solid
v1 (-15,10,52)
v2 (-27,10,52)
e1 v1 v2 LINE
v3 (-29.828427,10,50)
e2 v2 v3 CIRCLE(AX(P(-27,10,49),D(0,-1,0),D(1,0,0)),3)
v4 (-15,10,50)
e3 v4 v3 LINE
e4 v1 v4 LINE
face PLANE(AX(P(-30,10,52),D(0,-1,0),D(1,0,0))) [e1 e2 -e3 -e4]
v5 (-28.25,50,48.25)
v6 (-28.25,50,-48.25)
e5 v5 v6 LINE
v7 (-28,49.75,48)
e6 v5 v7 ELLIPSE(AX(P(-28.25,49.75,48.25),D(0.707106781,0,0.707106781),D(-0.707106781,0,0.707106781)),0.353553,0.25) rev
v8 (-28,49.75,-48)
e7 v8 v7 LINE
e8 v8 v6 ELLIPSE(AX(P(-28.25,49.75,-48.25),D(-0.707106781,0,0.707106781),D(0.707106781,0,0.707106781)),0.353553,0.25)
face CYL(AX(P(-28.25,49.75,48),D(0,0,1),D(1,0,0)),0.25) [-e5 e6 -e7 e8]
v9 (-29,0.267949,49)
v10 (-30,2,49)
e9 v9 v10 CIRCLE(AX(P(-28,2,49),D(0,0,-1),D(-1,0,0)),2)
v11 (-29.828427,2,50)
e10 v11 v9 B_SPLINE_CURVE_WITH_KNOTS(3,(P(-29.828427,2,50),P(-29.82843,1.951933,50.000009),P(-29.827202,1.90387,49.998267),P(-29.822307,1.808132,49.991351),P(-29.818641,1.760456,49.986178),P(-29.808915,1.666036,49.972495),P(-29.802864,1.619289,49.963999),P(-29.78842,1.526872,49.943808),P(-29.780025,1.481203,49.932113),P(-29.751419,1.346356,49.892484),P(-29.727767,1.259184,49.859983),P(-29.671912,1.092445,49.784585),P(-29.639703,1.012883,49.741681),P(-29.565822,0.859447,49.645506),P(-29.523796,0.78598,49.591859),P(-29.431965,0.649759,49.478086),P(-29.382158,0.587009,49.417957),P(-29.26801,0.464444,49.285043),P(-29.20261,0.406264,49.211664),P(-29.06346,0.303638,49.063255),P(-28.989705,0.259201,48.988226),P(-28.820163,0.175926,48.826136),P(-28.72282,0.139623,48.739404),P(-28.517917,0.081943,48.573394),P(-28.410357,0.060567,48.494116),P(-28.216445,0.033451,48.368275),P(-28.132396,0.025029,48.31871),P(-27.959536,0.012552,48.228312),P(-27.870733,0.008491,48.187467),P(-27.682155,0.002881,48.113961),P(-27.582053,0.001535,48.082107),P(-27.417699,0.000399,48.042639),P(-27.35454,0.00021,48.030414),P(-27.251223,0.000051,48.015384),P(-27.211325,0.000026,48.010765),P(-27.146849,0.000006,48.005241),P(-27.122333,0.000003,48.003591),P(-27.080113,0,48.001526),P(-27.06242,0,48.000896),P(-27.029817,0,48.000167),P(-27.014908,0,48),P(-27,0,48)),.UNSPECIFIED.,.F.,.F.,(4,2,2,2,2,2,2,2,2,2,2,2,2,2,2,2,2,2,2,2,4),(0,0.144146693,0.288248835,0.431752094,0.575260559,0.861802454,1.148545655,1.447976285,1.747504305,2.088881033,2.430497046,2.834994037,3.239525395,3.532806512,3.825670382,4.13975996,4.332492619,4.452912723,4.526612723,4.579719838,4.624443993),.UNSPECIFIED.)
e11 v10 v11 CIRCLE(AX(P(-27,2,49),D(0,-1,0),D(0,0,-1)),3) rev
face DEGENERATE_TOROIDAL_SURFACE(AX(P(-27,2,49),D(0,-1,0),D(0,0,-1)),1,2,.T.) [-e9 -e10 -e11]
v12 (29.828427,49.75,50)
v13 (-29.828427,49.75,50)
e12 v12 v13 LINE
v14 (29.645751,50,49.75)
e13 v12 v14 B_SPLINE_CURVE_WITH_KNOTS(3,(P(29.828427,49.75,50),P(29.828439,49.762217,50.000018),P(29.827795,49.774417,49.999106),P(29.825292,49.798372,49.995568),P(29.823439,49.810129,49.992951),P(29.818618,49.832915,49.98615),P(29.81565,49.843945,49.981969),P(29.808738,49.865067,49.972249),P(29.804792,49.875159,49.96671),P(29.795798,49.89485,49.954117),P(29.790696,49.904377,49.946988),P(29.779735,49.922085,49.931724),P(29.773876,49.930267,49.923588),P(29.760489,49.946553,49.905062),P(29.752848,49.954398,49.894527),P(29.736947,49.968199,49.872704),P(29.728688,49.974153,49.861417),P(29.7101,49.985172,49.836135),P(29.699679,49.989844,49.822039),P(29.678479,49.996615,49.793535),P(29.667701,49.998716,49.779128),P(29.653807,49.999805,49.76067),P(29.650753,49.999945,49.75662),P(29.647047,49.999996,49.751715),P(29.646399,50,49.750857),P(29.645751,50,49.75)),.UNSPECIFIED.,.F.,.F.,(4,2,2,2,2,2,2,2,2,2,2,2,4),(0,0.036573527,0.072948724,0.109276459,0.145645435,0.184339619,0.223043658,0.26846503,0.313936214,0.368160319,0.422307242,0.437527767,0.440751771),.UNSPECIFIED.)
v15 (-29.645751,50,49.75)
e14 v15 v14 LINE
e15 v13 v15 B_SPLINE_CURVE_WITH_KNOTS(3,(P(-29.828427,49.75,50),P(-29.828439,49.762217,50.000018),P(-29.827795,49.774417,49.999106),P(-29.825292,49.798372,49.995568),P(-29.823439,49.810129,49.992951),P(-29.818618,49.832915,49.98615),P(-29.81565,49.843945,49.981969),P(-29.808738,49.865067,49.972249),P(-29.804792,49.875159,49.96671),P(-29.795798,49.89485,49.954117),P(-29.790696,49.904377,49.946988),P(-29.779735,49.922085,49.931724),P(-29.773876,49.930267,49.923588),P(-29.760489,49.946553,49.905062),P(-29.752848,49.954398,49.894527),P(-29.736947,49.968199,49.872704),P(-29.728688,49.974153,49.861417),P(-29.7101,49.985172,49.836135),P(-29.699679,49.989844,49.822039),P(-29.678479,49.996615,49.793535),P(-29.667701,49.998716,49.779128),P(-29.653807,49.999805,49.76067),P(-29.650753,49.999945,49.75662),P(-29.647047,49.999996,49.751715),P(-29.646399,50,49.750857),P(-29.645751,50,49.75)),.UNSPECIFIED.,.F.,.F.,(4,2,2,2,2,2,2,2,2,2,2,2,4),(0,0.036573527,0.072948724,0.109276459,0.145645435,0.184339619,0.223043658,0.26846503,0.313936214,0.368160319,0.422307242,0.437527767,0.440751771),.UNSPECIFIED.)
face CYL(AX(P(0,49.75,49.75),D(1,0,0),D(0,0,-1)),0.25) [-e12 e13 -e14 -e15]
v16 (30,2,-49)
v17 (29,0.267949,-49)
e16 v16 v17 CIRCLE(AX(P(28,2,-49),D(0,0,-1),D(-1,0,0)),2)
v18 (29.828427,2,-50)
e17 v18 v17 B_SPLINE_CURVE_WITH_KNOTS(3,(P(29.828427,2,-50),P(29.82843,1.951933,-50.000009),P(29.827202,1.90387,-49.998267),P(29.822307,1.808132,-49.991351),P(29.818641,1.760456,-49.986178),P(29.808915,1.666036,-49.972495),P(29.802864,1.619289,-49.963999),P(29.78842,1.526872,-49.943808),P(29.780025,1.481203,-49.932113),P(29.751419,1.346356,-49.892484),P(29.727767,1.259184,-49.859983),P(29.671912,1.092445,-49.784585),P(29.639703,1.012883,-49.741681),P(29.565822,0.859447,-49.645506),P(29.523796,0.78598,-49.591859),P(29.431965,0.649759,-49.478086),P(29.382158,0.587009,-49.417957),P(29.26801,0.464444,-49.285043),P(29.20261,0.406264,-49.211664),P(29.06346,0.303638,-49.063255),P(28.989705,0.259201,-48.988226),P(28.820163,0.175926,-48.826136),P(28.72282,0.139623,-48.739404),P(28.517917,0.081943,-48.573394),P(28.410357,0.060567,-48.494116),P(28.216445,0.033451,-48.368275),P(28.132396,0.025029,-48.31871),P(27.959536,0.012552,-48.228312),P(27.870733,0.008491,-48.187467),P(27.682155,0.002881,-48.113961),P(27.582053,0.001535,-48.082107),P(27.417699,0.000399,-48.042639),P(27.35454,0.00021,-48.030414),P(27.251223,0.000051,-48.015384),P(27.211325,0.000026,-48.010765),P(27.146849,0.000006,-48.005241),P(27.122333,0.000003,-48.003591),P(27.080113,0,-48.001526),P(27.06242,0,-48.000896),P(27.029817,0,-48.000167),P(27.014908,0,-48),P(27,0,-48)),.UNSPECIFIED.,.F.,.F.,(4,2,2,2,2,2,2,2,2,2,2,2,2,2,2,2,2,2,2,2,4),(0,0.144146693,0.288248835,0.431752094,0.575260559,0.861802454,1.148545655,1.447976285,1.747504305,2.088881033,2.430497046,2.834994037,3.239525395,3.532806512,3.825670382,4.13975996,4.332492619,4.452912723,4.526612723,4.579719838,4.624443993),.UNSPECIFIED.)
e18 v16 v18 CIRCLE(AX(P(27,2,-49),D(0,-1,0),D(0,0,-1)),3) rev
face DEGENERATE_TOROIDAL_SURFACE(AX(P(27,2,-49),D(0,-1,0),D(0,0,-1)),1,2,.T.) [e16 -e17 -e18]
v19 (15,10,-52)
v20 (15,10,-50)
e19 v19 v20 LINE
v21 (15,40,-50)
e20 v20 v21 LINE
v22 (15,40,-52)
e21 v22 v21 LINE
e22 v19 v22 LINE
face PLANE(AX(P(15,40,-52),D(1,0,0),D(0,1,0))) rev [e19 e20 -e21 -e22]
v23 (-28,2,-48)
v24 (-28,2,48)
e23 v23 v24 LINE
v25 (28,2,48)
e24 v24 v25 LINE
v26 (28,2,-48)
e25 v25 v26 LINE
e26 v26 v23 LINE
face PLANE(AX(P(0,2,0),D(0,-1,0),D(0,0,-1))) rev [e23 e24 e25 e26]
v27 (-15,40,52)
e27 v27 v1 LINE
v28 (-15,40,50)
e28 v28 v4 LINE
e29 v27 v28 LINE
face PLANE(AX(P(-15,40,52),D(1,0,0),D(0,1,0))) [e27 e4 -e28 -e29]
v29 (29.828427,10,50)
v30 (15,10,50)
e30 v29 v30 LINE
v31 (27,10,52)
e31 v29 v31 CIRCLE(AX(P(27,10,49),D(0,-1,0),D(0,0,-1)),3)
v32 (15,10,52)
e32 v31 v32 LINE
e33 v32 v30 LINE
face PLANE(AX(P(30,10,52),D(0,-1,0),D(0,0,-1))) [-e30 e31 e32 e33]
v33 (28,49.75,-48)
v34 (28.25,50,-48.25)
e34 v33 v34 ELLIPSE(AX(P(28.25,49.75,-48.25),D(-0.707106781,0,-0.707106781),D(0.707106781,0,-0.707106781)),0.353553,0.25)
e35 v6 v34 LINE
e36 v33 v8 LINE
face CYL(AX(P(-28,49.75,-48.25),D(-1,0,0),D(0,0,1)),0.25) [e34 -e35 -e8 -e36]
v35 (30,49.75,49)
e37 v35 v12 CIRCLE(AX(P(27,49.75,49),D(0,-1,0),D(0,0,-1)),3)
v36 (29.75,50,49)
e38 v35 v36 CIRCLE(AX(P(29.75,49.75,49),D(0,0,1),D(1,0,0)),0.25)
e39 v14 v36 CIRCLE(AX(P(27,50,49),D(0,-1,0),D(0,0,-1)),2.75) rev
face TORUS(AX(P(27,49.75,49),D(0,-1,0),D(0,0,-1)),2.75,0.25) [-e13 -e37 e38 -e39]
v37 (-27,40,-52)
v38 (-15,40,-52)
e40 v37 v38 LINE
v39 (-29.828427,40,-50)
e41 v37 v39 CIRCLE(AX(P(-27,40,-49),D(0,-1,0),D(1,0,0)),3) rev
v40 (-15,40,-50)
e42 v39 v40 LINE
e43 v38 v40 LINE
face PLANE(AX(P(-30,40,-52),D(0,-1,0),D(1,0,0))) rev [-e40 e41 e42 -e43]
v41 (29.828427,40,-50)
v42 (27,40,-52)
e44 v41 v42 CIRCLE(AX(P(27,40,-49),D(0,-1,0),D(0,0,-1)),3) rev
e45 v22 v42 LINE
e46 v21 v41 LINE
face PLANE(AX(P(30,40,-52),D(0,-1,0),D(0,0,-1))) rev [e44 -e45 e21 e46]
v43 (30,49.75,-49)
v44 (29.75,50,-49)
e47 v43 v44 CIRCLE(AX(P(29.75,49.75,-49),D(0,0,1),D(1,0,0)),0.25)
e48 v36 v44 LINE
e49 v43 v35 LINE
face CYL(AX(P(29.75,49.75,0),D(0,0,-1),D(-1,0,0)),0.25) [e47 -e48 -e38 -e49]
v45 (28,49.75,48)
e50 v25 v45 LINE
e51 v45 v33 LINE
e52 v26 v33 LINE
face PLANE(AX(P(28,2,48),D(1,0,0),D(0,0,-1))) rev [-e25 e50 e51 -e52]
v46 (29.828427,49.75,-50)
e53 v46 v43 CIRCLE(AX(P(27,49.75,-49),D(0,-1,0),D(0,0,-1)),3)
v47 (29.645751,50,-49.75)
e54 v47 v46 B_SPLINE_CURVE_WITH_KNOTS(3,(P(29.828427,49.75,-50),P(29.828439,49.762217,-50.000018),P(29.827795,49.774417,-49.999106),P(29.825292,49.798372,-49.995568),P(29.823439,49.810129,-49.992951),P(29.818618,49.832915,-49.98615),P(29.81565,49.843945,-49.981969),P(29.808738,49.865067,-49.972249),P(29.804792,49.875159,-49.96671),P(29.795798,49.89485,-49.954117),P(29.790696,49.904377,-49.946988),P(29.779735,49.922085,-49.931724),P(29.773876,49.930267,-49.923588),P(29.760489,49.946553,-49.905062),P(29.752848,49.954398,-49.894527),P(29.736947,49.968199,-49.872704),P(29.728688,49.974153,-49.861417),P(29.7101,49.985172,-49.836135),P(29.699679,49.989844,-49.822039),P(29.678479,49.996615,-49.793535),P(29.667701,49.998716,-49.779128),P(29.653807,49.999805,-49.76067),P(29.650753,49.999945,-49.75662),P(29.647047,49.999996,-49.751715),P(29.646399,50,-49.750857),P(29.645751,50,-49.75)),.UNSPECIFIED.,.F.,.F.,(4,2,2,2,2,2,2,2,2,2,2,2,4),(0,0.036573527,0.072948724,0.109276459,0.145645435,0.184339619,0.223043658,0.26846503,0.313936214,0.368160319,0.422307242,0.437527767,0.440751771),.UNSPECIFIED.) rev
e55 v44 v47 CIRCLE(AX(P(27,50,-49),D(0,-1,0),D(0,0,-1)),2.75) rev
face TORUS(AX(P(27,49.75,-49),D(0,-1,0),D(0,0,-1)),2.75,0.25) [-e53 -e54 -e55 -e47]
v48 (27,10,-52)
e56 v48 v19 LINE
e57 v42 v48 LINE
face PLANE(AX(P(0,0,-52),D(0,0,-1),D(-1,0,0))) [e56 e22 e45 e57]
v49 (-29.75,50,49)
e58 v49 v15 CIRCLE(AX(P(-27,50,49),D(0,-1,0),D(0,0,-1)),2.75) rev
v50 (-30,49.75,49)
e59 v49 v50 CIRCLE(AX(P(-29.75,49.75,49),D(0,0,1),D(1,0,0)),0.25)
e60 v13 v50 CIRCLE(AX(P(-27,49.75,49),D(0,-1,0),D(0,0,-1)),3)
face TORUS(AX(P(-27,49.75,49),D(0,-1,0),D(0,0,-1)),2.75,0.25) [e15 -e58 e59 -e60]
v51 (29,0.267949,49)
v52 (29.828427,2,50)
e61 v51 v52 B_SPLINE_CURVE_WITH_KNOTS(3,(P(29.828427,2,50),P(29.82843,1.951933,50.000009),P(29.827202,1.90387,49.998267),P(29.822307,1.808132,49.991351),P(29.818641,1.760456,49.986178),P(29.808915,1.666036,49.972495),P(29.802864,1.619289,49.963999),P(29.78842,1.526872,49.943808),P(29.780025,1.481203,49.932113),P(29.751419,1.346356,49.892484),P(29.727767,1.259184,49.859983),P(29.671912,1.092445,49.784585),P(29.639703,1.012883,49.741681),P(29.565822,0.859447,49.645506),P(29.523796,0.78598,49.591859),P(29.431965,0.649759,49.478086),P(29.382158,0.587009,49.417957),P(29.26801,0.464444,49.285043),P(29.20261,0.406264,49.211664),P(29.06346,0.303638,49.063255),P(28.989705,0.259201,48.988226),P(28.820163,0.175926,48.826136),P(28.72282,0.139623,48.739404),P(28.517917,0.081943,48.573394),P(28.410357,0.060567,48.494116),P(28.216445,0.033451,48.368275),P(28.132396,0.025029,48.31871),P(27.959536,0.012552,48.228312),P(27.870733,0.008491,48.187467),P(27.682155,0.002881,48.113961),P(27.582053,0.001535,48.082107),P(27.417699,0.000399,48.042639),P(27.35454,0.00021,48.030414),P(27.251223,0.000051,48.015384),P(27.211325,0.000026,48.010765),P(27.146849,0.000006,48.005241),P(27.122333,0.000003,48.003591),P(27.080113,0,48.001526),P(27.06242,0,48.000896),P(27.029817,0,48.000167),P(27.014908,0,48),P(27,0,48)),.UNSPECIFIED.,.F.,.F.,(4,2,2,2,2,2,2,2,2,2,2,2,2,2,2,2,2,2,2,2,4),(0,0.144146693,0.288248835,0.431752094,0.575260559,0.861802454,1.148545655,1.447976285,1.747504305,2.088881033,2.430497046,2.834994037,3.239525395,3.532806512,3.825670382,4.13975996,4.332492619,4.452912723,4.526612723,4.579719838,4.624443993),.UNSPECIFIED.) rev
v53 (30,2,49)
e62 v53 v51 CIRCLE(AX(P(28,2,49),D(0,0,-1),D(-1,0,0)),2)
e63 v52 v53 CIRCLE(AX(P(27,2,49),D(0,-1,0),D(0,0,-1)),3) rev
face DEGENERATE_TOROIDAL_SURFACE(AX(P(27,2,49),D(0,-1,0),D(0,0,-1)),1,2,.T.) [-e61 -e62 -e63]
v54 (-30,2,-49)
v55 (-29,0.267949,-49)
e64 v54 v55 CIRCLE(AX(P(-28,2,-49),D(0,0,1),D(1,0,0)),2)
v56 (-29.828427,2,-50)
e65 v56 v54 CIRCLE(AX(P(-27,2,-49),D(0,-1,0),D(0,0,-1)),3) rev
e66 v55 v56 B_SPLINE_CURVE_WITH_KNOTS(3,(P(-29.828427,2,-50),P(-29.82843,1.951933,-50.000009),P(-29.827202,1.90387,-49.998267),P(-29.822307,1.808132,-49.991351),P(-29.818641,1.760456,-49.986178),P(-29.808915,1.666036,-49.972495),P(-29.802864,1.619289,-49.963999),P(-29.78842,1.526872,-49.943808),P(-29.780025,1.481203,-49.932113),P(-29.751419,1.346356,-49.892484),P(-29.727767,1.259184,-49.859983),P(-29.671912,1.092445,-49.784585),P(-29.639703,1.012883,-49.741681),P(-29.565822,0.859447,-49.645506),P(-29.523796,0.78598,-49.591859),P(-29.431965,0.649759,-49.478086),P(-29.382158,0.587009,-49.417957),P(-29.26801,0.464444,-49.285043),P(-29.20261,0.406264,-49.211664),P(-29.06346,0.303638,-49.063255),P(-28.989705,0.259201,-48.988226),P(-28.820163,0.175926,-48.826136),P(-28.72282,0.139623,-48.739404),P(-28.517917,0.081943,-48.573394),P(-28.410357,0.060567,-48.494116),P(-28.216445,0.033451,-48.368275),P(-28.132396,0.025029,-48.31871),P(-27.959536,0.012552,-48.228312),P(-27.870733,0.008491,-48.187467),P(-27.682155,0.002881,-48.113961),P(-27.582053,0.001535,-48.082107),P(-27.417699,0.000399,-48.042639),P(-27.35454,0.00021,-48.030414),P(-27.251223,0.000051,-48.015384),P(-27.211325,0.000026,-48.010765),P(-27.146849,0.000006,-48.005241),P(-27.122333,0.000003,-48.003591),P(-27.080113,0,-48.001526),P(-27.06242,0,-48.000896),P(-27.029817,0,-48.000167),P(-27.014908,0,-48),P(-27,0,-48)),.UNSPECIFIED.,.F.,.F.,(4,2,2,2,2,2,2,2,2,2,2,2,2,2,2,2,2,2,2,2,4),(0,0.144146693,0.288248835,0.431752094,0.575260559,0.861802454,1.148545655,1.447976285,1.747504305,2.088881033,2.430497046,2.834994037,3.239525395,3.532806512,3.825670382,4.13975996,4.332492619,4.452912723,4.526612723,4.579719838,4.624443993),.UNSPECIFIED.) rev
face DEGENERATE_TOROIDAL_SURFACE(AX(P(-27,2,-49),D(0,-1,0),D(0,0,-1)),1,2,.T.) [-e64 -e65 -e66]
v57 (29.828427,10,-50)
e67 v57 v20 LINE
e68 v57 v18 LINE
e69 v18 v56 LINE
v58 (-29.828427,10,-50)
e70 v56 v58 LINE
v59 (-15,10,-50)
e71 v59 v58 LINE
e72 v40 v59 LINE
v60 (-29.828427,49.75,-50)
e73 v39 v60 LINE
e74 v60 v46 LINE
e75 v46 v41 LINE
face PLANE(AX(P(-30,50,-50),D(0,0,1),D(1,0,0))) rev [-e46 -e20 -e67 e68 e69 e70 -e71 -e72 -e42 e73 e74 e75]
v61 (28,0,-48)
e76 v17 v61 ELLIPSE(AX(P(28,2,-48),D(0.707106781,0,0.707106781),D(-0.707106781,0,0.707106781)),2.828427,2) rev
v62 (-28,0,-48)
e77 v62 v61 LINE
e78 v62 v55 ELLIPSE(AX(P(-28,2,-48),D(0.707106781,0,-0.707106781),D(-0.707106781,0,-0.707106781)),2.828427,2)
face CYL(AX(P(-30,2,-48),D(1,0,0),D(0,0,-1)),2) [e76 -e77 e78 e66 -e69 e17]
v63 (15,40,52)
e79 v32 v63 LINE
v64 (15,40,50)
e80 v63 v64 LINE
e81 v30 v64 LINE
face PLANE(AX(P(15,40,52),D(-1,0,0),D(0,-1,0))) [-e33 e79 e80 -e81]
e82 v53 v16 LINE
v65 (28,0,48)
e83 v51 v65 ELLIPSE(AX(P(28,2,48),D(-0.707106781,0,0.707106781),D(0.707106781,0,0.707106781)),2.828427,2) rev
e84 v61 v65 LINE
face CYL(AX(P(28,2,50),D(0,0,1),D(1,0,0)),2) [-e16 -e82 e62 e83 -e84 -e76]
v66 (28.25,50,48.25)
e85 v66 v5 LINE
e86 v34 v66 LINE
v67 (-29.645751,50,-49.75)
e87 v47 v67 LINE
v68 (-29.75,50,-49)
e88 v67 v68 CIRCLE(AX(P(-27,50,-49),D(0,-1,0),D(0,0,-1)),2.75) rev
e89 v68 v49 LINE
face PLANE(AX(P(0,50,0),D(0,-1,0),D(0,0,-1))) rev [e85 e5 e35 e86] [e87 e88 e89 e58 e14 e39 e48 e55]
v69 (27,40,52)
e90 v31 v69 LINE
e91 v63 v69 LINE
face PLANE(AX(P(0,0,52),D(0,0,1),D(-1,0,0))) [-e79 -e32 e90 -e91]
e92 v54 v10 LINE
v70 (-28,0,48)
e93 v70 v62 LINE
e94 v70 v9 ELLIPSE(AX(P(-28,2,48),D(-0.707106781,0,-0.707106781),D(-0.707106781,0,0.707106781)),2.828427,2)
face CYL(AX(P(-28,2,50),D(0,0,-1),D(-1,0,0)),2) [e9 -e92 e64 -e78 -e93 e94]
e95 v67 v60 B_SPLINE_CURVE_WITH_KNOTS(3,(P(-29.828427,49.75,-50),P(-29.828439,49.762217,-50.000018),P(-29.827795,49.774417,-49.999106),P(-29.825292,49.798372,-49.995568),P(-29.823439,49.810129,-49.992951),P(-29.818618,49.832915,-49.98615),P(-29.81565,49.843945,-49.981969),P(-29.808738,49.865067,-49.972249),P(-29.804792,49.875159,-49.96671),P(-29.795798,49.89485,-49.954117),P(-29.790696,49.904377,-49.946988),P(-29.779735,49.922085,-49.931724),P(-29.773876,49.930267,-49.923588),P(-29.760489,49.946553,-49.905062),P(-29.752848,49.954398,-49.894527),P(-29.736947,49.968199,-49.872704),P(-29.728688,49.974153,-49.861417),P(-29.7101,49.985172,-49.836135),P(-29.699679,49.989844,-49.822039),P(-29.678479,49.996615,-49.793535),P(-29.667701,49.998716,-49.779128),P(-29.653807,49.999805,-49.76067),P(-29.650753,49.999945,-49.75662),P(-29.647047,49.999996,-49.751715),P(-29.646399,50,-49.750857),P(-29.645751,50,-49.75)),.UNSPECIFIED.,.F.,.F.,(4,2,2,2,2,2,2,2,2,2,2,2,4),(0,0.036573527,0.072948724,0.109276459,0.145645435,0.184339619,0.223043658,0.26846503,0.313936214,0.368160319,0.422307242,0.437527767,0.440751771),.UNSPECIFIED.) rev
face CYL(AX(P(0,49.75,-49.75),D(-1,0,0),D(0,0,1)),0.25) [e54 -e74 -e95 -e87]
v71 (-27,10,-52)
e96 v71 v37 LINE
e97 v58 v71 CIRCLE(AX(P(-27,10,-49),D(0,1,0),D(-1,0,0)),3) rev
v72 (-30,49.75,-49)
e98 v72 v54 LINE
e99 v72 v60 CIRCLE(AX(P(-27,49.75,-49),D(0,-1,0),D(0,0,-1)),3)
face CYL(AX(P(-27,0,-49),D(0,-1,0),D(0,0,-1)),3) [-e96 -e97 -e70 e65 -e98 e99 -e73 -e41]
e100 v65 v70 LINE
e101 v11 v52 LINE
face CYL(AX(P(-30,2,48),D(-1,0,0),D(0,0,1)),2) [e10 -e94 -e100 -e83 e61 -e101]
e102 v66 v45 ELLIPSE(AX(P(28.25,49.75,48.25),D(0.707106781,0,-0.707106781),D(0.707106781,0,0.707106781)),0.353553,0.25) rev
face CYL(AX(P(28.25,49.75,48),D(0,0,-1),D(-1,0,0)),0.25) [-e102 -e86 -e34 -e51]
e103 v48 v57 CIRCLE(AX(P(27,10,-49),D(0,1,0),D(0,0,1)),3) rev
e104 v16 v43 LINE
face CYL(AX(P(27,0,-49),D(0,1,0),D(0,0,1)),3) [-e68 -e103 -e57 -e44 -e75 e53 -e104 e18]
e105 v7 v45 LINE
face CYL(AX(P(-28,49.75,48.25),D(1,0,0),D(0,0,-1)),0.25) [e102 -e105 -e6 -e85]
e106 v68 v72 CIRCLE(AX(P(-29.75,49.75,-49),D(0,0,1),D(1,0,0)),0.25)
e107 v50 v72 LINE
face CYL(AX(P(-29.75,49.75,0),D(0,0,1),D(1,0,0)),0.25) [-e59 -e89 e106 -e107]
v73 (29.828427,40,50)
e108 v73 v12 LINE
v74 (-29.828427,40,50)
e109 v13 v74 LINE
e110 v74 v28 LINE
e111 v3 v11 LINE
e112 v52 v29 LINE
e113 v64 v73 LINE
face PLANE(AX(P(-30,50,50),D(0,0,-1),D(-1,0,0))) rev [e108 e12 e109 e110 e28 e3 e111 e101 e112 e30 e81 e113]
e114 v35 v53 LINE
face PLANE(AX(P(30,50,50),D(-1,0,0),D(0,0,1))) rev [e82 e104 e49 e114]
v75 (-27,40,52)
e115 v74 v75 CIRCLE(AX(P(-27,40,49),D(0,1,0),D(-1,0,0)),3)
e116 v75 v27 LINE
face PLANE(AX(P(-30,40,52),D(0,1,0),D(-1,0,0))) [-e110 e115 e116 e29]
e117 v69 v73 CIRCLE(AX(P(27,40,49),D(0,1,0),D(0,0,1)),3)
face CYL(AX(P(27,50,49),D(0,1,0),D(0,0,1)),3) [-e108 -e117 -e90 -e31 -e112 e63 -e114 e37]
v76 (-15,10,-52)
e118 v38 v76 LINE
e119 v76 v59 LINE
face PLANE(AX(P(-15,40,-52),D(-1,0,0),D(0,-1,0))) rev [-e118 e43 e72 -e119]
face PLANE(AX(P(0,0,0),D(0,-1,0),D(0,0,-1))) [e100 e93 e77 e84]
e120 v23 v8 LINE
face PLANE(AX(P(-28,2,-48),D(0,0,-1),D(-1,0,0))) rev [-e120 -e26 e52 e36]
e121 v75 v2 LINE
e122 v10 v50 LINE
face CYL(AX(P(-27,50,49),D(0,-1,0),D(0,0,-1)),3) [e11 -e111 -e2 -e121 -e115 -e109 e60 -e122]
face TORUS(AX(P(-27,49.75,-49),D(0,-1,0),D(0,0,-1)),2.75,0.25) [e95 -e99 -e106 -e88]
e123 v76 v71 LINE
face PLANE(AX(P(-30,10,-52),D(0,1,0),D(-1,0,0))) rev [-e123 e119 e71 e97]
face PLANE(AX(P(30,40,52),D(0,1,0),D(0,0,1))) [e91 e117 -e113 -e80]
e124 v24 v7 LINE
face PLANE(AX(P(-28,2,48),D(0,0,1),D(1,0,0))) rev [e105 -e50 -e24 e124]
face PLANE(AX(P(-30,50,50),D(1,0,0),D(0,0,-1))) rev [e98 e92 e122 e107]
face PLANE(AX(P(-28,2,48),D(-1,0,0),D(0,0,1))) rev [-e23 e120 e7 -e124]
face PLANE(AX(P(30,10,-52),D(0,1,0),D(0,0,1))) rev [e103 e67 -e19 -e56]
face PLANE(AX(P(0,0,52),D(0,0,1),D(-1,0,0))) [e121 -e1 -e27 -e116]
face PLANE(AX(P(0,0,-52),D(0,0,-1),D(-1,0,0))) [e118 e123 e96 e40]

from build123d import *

# Parameters (mm, degrees)
SKETCH2_W            = 60
SKETCH2_H            = 100
BOSS_EXTRUDE1_DEPTH  = 50
SKETCH3_W            = 56
SKETCH3_H            = 96
CUT_EXTRUDE1_DEPTH   = 48
SKETCH4_W            = 15
SKETCH4_H            = 30
BOSS_EXTRUDE2_DEPTH  = 2
FILLET1_R            = 3
FILLET1_OF_MIRROR1_R = 3
FILLET2_R            = 2
FILLET3_R            = 0.25


with BuildPart() as part:
    # Sketch2 → Boss-Extrude1 (new body)
    with BuildSketch(Plane(origin=(0, 0, 0), x_dir=(1, 0, 0), z_dir=(0, 1, 0))):
        Rectangle(SKETCH2_W, SKETCH2_H)
    extrude(amount=BOSS_EXTRUDE1_DEPTH)

    # Sketch3 → Cut-Extrude1 (cut)
    with BuildSketch(Plane(origin=(0, 50, 0), x_dir=(1, 0, 0), z_dir=(0, 1, 0))):
        Rectangle(SKETCH3_W, SKETCH3_H)
    extrude(amount=-CUT_EXTRUDE1_DEPTH, mode=Mode.SUBTRACT)

    # Sketch4 → Boss-Extrude2 (add)
    with BuildSketch(Plane(origin=(0, 0, -50), x_dir=(-1, 0, 0), z_dir=(0, 0, -1))):
        with Locations((-22.5, 25)):
            Rectangle(SKETCH4_W, SKETCH4_H)
        with Locations((22.5, 25)):
            Rectangle(SKETCH4_W, SKETCH4_H)
    boss_extrude2 = extrude(amount=BOSS_EXTRUDE2_DEPTH)

    # Fillet1
    fillet1_edges = [part.edges().sort_by_distance(p)[0] for p in [
        (30, 25, -52),
        (-30, 25, -52),
    ]]
    fillet(fillet1_edges, radius=FILLET1_R)

    # Mirror1: Boss-Extrude2 across plane
    add(boss_extrude2.mirror(Plane.XY))

    # Fillet1 of Mirror1
    fillet1_of_mirror1_edges = [part.edges().sort_by_distance(p)[0] for p in [
        (30, 25, 52),
        (-30, 25, 52),
    ]]
    fillet(fillet1_of_mirror1_edges, radius=FILLET1_OF_MIRROR1_R)

    # Fillet2
    # the kernel refuses this fillet: 2 mm, written as the material it takes off along each edge
    with BuildSketch(Plane(origin=(34.828427125, 0, -50), x_dir=(0, 0, 1), z_dir=(-1, 0, 0)), Plane(origin=(-34.828427125, 0, 50), x_dir=(0, 0, -1), z_dir=(1, 0, 0))) as fillet2_piece_1:
        with BuildLine():
            CenterArc((FILLET2_R, FILLET2_R), FILLET2_R, 180, 90)
            Line((0, FILLET2_R), (0, 0))
            Line((0, 0), (FILLET2_R, 0))
        make_face()
    extrude(amount=69.656854249, mode=Mode.SUBTRACT)
    with BuildSketch(Plane(origin=(-30, 0, -49), x_dir=(0, 1, 0), z_dir=(0, 0, 1))) as fillet2_piece_2:
        with BuildLine():
            CenterArc((FILLET2_R, -FILLET2_R), FILLET2_R, 90, 90)
            Line((0, -FILLET2_R), (0, 0))
            Line((0, 0), (FILLET2_R, 0))
        make_face()
    extrude(amount=98, mode=Mode.SUBTRACT)
    with BuildSketch(Plane(origin=(30, 0, 49), x_dir=(-1, 0, 0), z_dir=(0, 0, -1))) as fillet2_piece_3:
        with BuildLine():
            CenterArc((FILLET2_R, FILLET2_R), FILLET2_R, 180, 90)
            Line((0, FILLET2_R), (0, 0))
            Line((0, 0), (FILLET2_R, 0))
        make_face()
    extrude(amount=98, mode=Mode.SUBTRACT)
    with BuildSketch(Plane(origin=(27, 0, 49), x_dir=(1, 0, 0), z_dir=(0, 0, -1))) as fillet2_piece_4:
        with BuildLine():
            CenterArc((3 - FILLET2_R, -FILLET2_R), FILLET2_R, 0, 90)
            Line((3, -FILLET2_R), (3, 0))
            Line((3, 0), (3 - FILLET2_R, 0))
        make_face()
    revolve(axis=Axis((27, 0, 49), (0, -1, 0)), revolution_arc=114.9659815, mode=Mode.SUBTRACT)
    with BuildSketch(Plane(origin=(27, 0, -49), x_dir=(1, 0, 0), z_dir=(0, 0, 1))) as fillet2_piece_5:
        with BuildLine():
            CenterArc((3 - FILLET2_R, FILLET2_R), FILLET2_R, 270, 90)
            Line((3, FILLET2_R), (3, 0))
            Line((3, 0), (3 - FILLET2_R, 0))
        make_face()
    revolve(axis=Axis((27, 0, -49), (0, 1, 0)), revolution_arc=114.9659815, mode=Mode.SUBTRACT)
    with BuildSketch(Plane(origin=(-27, 0, -49), x_dir=(-1, 0, 0), z_dir=(0, 0, 1))) as fillet2_piece_6:
        with BuildLine():
            CenterArc((3 - FILLET2_R, -FILLET2_R), FILLET2_R, 0, 90)
            Line((3 - FILLET2_R, 0), (3, 0))
            Line((3, 0), (3, -FILLET2_R))
        make_face()
    revolve(axis=Axis((-27, 0, -49), (0, -1, 0)), revolution_arc=114.9659815, mode=Mode.SUBTRACT)
    with BuildSketch(Plane(origin=(-27, 0, 49), x_dir=(-1, 0, 0), z_dir=(0, 0, -1))) as fillet2_piece_7:
        with BuildLine():
            CenterArc((3 - FILLET2_R, FILLET2_R), FILLET2_R, 270, 90)
            Line((3 - FILLET2_R, 0), (3, 0))
            Line((3, 0), (3, FILLET2_R))
        make_face()
    revolve(axis=Axis((-27, 0, 49), (0, 1, 0)), revolution_arc=114.9659815, mode=Mode.SUBTRACT)

    # Fillet3
    fillet3_edges = [part.edges().sort_by_distance(p)[0] for p in [
        (0, 50, 50),
        (-29.956795679, 50, 49.507305936),
        (29.956795679, 50, 49.507305936),
        (28, 50, 0),
        (0, 50, -48),
        (-28, 50, 0),
        (0, 50, 48),
        (0, 50, -50),
        (-30, 50, 0),
        (-29.956795679, 50, -49.507305936),
        (29.956795679, 50, -49.507305936),
        (30, 50, 0),
    ]]
    fillet(fillet3_edges, radius=FILLET3_R)


solid = part.part
